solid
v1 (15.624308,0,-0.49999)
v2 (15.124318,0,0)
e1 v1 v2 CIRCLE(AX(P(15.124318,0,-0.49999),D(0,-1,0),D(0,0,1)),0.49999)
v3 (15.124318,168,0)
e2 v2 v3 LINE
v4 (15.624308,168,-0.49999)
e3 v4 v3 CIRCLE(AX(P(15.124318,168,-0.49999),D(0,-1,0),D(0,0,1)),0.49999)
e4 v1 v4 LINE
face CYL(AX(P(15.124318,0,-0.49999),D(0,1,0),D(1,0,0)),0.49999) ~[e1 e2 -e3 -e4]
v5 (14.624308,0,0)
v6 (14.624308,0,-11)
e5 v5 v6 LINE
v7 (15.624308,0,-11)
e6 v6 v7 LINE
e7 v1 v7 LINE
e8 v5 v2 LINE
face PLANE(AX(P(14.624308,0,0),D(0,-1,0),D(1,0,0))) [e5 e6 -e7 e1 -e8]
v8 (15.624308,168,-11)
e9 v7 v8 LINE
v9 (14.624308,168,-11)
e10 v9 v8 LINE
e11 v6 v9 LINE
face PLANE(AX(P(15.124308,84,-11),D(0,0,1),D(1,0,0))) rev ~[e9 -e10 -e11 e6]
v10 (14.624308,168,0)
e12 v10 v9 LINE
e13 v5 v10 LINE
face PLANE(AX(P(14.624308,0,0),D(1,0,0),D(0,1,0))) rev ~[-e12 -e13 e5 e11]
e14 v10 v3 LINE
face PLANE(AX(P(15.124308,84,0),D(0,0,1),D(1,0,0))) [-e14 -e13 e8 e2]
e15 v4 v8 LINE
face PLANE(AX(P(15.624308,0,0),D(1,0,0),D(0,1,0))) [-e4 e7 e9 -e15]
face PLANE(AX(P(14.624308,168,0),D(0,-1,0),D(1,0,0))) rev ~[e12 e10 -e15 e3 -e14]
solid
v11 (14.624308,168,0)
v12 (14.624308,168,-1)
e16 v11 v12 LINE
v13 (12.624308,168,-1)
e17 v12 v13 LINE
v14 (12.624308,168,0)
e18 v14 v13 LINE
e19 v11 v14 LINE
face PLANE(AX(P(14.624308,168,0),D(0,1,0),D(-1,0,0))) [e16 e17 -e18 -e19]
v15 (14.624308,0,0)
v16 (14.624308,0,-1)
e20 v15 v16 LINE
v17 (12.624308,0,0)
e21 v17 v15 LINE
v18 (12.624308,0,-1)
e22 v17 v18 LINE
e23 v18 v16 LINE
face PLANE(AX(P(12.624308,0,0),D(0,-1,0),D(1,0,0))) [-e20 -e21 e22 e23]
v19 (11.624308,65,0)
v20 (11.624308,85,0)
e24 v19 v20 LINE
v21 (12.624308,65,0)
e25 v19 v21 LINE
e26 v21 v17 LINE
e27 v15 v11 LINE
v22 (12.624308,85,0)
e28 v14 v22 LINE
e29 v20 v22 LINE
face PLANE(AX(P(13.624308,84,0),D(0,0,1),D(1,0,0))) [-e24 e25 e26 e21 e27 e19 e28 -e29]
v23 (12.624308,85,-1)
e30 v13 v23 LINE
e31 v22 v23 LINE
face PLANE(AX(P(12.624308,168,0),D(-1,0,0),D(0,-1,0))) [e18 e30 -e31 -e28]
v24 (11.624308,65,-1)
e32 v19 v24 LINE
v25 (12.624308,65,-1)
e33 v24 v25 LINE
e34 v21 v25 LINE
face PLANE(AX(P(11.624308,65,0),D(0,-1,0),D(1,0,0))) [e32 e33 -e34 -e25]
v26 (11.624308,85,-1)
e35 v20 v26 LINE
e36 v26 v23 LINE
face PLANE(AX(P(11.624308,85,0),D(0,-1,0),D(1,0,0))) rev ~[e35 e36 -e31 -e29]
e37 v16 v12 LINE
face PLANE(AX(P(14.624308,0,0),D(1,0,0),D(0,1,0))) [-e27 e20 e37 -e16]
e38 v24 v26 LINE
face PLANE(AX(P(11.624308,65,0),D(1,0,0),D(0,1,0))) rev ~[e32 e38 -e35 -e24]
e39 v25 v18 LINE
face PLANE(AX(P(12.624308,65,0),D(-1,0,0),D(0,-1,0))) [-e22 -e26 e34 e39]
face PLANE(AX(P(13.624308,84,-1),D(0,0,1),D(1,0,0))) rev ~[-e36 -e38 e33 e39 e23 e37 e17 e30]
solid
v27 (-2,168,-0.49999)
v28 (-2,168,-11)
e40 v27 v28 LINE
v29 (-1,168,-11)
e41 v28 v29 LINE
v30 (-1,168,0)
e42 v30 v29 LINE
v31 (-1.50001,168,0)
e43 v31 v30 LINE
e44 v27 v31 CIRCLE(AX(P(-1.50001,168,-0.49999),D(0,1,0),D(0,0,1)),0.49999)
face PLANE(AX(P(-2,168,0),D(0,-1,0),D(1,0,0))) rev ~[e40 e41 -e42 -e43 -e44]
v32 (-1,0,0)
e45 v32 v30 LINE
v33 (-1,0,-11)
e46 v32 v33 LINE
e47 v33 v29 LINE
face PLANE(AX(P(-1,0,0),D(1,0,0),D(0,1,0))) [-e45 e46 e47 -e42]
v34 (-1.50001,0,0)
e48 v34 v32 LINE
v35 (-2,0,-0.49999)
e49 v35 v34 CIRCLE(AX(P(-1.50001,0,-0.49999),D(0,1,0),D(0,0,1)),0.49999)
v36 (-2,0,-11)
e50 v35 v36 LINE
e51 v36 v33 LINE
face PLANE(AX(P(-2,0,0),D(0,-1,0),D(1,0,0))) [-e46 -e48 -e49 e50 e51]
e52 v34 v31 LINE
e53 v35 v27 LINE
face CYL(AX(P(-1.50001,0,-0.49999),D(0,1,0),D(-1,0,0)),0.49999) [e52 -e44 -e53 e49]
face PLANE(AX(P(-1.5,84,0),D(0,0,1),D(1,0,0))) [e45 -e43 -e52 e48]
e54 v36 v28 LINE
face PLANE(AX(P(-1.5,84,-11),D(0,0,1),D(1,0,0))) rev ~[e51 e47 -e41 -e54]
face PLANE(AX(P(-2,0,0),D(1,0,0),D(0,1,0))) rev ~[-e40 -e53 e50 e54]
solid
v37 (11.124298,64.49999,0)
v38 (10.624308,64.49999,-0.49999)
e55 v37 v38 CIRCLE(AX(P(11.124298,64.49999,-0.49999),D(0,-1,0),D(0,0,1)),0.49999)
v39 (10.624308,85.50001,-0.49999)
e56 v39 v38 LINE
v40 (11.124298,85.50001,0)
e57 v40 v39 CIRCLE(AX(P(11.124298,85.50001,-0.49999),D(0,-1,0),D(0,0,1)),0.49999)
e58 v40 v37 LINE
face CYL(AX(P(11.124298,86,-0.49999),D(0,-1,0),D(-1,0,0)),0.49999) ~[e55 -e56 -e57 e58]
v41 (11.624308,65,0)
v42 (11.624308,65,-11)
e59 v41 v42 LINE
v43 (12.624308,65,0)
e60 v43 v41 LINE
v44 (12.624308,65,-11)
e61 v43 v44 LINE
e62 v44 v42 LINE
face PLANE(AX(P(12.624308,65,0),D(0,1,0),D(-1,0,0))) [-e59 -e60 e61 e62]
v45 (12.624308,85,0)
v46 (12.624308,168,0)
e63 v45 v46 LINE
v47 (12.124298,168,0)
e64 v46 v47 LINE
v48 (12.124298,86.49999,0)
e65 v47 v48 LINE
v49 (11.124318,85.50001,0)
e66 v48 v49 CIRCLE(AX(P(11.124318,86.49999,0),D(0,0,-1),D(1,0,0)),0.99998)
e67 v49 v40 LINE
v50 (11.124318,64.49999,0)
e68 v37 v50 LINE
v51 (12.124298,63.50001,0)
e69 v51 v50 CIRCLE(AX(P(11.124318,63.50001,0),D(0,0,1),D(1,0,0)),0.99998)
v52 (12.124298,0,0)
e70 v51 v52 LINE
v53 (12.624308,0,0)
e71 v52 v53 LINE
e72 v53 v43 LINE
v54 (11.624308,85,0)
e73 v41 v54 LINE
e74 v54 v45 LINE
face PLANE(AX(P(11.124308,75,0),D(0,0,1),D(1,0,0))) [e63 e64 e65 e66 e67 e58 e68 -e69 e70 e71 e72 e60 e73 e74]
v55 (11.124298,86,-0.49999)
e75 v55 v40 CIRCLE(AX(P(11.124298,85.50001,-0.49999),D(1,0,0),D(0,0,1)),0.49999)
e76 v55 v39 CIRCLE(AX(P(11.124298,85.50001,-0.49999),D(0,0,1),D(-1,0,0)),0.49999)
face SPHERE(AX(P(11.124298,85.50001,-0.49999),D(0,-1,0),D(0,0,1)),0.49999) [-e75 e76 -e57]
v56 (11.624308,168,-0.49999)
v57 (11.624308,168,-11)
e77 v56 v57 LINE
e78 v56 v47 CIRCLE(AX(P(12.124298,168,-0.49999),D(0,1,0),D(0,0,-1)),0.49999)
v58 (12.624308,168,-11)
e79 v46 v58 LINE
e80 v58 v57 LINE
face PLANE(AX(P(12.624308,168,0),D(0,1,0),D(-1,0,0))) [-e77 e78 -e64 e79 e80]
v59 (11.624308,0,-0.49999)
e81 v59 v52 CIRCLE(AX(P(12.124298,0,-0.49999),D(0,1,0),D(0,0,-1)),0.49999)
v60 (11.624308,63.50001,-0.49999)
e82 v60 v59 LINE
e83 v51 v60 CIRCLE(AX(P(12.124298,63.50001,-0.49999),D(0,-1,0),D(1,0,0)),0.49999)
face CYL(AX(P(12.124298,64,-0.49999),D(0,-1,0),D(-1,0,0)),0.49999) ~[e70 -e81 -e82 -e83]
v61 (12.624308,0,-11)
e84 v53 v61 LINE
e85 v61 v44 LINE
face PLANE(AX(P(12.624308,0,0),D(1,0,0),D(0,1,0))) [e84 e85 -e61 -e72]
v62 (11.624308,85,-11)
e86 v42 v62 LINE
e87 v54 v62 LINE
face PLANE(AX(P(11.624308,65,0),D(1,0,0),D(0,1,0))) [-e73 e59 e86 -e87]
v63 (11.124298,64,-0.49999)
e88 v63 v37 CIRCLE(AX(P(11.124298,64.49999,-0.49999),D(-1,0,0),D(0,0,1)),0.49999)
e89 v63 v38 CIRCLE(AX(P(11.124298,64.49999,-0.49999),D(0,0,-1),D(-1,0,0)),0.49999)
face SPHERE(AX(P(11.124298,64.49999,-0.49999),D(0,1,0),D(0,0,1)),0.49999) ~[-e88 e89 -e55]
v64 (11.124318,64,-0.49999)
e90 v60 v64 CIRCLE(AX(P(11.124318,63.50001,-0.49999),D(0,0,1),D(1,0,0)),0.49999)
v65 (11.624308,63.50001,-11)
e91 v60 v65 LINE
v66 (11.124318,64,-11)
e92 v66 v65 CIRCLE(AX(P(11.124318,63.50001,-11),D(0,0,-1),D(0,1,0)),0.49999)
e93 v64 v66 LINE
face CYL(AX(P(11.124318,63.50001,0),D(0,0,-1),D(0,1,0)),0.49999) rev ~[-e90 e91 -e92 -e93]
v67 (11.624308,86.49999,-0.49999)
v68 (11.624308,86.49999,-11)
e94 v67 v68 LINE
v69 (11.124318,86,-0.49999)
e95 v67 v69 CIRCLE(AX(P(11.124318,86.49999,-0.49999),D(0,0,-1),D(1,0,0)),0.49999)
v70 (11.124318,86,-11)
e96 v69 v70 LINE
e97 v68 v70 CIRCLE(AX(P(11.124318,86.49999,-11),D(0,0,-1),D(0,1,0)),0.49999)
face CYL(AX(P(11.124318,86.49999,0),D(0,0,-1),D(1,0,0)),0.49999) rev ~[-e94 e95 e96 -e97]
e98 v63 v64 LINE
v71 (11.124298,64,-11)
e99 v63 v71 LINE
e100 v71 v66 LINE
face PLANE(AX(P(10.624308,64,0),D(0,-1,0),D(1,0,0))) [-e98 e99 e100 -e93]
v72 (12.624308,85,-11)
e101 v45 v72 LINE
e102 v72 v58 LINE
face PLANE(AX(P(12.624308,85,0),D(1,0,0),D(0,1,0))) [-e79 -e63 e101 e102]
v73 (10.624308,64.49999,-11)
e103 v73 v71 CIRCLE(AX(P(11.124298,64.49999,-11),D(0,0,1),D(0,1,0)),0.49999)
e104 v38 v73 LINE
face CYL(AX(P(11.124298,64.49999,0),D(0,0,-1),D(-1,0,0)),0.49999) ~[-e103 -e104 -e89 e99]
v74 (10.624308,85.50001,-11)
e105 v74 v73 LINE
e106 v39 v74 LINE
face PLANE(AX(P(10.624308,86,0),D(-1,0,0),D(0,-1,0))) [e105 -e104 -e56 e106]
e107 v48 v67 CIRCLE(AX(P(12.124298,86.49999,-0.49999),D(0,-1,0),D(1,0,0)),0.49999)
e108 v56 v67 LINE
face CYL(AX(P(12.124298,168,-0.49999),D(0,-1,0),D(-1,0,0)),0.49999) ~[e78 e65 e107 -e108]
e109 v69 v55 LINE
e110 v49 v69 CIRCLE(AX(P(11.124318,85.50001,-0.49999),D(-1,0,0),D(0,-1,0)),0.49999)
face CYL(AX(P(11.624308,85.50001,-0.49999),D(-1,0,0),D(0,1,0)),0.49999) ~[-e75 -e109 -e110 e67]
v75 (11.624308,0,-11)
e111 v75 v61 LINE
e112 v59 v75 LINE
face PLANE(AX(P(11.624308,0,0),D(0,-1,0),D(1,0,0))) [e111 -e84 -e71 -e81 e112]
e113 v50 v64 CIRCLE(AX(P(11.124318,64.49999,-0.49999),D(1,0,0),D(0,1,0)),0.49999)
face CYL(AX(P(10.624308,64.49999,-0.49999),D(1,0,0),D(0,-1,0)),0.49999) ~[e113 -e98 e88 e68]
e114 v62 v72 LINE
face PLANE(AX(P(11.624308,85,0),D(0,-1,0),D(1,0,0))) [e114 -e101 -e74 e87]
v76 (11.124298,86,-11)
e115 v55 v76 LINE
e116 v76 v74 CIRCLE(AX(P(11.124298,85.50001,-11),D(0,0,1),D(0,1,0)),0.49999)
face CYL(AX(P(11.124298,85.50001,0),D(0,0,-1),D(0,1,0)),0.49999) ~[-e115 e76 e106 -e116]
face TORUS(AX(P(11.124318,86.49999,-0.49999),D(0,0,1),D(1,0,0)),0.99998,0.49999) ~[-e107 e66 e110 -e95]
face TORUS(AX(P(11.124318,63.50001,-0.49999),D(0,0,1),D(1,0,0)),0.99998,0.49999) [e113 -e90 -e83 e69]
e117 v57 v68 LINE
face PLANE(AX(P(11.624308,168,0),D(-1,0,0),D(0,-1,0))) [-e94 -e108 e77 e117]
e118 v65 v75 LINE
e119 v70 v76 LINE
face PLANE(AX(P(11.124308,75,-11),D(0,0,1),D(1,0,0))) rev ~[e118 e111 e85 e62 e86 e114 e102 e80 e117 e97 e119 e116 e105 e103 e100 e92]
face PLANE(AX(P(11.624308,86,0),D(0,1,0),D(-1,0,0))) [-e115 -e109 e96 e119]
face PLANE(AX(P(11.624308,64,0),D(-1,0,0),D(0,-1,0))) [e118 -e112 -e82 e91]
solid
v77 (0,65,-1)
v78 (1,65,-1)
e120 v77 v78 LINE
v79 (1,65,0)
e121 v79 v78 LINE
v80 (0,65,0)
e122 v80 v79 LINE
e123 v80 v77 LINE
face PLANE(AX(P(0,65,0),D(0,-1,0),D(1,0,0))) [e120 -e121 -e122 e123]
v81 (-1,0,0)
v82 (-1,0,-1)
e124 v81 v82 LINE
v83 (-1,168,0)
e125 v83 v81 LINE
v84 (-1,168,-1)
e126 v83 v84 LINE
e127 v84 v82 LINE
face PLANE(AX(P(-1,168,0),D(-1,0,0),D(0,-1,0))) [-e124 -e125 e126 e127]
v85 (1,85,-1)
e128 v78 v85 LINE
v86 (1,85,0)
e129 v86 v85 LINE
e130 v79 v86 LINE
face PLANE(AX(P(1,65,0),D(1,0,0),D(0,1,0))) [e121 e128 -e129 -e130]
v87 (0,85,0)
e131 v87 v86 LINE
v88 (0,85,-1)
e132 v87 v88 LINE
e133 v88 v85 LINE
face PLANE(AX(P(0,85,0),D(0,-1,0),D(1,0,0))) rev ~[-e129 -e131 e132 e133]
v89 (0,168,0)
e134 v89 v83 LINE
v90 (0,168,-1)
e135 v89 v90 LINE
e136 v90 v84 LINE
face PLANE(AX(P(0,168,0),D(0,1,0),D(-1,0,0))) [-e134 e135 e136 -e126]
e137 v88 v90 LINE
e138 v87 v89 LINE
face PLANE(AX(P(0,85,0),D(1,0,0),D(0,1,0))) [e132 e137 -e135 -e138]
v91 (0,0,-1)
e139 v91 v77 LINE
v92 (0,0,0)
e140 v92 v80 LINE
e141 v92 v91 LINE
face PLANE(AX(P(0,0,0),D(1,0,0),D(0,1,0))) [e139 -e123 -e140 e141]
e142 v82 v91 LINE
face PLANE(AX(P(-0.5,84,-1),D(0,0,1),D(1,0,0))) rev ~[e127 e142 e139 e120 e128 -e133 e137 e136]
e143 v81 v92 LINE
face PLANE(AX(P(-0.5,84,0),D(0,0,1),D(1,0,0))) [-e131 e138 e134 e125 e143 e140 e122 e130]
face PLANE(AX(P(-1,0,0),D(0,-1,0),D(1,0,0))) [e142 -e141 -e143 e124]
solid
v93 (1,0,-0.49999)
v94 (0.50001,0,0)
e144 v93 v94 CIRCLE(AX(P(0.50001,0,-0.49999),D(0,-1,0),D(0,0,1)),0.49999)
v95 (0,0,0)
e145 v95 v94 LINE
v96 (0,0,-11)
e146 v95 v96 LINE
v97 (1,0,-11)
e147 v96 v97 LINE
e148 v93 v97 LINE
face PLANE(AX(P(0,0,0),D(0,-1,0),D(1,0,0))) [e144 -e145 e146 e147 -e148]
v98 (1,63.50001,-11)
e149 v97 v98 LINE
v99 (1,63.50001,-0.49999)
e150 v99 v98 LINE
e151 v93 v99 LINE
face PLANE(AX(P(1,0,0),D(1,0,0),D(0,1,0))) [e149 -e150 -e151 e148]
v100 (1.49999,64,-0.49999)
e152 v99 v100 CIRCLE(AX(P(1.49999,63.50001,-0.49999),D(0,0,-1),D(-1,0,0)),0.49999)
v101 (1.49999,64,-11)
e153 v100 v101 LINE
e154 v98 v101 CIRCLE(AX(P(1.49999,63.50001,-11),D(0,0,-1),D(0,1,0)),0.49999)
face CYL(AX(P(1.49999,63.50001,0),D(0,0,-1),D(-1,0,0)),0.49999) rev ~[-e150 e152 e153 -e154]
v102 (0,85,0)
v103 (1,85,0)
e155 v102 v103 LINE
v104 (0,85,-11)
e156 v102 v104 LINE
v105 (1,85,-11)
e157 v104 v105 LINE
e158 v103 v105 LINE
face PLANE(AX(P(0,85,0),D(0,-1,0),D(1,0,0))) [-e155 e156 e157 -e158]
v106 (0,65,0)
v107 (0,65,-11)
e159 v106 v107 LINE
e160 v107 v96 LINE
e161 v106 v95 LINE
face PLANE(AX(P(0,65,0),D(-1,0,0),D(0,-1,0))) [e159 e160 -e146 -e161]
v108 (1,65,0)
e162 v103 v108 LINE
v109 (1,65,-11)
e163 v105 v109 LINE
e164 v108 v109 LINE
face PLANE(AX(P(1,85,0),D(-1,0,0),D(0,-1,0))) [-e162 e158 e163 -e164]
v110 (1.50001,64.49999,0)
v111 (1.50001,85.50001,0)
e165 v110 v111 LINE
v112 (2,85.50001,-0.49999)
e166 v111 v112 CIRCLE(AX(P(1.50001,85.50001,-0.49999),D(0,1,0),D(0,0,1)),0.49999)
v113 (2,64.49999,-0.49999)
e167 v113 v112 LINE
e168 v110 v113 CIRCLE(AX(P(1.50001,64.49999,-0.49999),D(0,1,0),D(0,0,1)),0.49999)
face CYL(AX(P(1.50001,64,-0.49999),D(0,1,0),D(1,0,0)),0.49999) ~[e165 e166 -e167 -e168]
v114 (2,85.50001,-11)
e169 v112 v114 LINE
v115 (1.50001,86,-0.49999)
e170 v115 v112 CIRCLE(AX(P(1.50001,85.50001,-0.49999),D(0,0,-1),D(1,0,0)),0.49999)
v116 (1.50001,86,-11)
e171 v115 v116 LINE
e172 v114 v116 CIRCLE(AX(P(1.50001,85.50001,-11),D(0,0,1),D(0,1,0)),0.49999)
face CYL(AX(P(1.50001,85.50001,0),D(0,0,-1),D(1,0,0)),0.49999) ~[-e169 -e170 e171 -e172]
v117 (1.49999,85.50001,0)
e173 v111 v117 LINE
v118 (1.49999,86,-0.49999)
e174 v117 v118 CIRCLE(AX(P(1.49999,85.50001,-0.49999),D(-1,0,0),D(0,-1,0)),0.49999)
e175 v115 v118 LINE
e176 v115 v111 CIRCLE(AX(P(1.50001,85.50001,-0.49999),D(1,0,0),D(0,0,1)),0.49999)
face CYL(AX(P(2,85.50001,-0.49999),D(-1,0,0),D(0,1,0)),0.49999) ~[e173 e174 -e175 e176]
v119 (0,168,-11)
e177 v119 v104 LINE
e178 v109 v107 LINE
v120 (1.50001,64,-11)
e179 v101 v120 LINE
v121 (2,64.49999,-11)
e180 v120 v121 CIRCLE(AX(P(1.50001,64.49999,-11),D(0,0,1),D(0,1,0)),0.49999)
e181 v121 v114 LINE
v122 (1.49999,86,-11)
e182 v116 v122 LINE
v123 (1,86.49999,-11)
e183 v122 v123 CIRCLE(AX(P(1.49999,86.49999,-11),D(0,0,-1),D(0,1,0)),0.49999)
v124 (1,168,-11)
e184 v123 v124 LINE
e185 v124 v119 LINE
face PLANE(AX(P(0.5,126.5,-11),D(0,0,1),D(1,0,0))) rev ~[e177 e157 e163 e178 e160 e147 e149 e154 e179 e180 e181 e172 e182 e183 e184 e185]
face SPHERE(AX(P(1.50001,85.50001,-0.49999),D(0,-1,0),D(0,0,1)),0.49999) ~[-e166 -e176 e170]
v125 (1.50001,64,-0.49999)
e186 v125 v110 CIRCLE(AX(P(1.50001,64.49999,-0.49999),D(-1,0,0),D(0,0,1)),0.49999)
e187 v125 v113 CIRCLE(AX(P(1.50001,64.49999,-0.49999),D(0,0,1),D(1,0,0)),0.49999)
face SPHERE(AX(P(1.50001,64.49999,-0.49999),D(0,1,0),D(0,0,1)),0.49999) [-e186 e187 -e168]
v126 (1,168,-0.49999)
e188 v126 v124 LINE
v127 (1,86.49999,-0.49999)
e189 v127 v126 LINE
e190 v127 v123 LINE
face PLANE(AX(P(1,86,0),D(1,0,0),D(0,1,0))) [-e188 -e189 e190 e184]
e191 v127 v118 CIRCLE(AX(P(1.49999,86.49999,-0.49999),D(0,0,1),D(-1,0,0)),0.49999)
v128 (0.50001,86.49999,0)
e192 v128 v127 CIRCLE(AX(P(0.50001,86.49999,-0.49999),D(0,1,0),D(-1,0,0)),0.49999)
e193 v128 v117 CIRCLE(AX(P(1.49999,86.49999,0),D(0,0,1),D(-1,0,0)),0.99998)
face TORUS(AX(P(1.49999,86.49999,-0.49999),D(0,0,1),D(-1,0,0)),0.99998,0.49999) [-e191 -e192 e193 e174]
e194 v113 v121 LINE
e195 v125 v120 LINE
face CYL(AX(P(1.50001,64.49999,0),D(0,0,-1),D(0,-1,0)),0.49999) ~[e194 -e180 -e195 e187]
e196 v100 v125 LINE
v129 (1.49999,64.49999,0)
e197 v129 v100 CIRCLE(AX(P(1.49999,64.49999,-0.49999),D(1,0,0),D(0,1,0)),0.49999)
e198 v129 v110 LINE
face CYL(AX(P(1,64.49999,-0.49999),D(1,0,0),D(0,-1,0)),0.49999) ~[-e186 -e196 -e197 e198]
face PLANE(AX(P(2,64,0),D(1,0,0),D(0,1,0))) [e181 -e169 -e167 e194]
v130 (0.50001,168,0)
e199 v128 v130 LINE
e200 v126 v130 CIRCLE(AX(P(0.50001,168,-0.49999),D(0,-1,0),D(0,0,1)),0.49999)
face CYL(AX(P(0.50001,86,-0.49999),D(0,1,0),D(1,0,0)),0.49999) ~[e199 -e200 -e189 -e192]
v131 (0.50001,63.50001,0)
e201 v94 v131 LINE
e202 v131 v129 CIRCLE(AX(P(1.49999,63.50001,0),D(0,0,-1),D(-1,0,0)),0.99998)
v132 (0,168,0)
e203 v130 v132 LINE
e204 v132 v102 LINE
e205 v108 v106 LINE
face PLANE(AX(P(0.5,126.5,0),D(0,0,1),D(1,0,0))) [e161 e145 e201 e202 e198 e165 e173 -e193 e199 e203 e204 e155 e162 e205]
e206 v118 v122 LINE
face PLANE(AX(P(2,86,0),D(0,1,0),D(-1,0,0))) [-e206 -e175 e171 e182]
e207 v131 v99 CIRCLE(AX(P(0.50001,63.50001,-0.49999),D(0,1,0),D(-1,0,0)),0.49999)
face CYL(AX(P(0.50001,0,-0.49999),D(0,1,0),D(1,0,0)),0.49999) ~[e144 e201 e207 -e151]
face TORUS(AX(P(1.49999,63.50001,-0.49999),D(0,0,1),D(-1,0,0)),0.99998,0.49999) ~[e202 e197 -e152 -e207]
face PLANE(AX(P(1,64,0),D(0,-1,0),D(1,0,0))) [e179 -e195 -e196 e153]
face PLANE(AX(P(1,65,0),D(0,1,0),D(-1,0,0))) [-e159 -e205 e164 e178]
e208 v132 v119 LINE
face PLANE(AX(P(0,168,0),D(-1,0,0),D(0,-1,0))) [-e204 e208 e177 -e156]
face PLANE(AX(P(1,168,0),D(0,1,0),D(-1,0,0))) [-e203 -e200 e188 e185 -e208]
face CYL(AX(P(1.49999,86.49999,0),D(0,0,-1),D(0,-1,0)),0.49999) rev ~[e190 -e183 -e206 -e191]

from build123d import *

# Parameters (mm, degrees)
F0_W     = 1
F0_H     = 20
F1_DEPTH = 1
F0_H_2   = 168
F2_DEPTH = 11
F3_R     = 0.49999
F3_2_R   = 0.49999
F3_3_R   = 0.49999
F3_4_R   = 0.49999


# Not quite as in the source:
# - a fillet or chamfer is up to 0.001 mm smaller than in the source, because OpenCascade refuses the exact size


with BuildPart() as f1:
    # F0 (on Top) → F1 (new body)
    with BuildSketch(Plane.XY):
        Polygon((-1, 0), (0, 0), (0, 65), (0, 85), (0, 168), (-1, 168), align=None)
        with Locations((0.5, 75)):
            Rectangle(F0_W, F0_H)
    extrude(amount=-F1_DEPTH)


with BuildPart() as f1b:
    # F0 (on Top) → F1, piece 2 (new body)
    with BuildSketch(Plane.XY):
        Polygon((12.6243081391, 65), (12.6243081391, 0), (14.6243081391, 0), (14.6243081391, 168), (12.6243081391, 168), (12.6243081391, 85), align=None)
        with Locations((12.1243081391, 75)):
            Rectangle(F0_W, F0_H)
    extrude(amount=-F1_DEPTH)


with BuildPart() as f2:
    # F0 (on Top) → F2 (new body)
    with BuildSketch(Plane.XY):
        with Locations((-1.5, 84)):
            Rectangle(F0_W, F0_H_2)
    extrude(amount=-F2_DEPTH)

    # F3#4 (radius 0.5 in the source; OpenCascade refuses exactly that, so slightly less here)
    f3_4_edges = [f2.edges().sort_by_distance(p)[0] for p in [
        (-2, 84, 0),
    ]]
    fillet(f3_4_edges, radius=F3_4_R)


with BuildPart() as f2b:
    # F0 (on Top) → F2, piece 2 (new body)
    with BuildSketch(Plane.XY):
        Polygon((0, 168), (0, 85), (1, 85), (1, 86), (1, 168), align=None)
        Polygon((1, 85), (1, 65), (1, 64), (2, 64), (2, 86), (1, 86), align=None)
        Polygon((0, 65), (0, 0), (1, 0), (1, 64), (1, 65), align=None)
    extrude(amount=-F2_DEPTH)

    # F3#3 (radius 0.5 in the source; OpenCascade refuses exactly that, so slightly less here)
    f3_3_edges = [f2b.edges().sort_by_distance(p)[0] for p in [
        (1, 32, 0),
        (2, 75, 0),
        (1, 127, 0),
        (1.5, 86, 0),
        (1.5, 64, 0),
        (2, 64, -5.5),
        (2, 86, -5.5),
        (1, 86, -5.5),
        (1, 64, -5.5),
    ]]
    fillet(f3_3_edges, radius=F3_3_R)


with BuildPart() as f2c:
    # F0 (on Top) → F2, piece 3 (new body)
    with BuildSketch(Plane.XY):
        Polygon((11.6243081391, 64), (11.6243081391, 65), (11.6243081391, 85), (11.6243081391, 86), (10.6243081391, 86), (10.6243081391, 64), align=None)
        Polygon((11.6243081391, 0), (12.6243081391, 0), (12.6243081391, 65), (11.6243081391, 65), (11.6243081391, 64), align=None)
        Polygon((11.6243081391, 85), (12.6243081391, 85), (12.6243081391, 168), (11.6243081391, 168), (11.6243081391, 86), align=None)
    extrude(amount=-F2_DEPTH)

    # F3#2 (radius 0.5 in the source; OpenCascade refuses exactly that, so slightly less here)
    f3_2_edges = [f2c.edges().sort_by_distance(p)[0] for p in [
        (11.624308, 32, 0),
        (10.624308, 75, 0),
        (11.624308, 127, 0),
        (11.124308, 86, 0),
        (11.124308, 64, 0),
        (10.624308, 64, -5.5),
        (10.624308, 86, -5.5),
        (11.624308, 86, -5.5),
        (11.624308, 64, -5.5),
    ]]
    fillet(f3_2_edges, radius=F3_2_R)


with BuildPart() as f2d:
    # F0 (on Top) → F2, piece 4 (new body)
    with BuildSketch(Plane.XY):
        with Locations((15.1243081391, 84)):
            Rectangle(F0_W, F0_H_2)
    extrude(amount=-F2_DEPTH)

    # F3 (radius 0.5 in the source; OpenCascade refuses exactly that, so slightly less here)
    f3_edges = [f2d.edges().sort_by_distance(p)[0] for p in [
        (15.624308, 84, 0),
    ]]
    fillet(f3_edges, radius=F3_R)


solid = Compound([f1.part, f1b.part, f2.part, f2b.part, f2c.part, f2d.part])
